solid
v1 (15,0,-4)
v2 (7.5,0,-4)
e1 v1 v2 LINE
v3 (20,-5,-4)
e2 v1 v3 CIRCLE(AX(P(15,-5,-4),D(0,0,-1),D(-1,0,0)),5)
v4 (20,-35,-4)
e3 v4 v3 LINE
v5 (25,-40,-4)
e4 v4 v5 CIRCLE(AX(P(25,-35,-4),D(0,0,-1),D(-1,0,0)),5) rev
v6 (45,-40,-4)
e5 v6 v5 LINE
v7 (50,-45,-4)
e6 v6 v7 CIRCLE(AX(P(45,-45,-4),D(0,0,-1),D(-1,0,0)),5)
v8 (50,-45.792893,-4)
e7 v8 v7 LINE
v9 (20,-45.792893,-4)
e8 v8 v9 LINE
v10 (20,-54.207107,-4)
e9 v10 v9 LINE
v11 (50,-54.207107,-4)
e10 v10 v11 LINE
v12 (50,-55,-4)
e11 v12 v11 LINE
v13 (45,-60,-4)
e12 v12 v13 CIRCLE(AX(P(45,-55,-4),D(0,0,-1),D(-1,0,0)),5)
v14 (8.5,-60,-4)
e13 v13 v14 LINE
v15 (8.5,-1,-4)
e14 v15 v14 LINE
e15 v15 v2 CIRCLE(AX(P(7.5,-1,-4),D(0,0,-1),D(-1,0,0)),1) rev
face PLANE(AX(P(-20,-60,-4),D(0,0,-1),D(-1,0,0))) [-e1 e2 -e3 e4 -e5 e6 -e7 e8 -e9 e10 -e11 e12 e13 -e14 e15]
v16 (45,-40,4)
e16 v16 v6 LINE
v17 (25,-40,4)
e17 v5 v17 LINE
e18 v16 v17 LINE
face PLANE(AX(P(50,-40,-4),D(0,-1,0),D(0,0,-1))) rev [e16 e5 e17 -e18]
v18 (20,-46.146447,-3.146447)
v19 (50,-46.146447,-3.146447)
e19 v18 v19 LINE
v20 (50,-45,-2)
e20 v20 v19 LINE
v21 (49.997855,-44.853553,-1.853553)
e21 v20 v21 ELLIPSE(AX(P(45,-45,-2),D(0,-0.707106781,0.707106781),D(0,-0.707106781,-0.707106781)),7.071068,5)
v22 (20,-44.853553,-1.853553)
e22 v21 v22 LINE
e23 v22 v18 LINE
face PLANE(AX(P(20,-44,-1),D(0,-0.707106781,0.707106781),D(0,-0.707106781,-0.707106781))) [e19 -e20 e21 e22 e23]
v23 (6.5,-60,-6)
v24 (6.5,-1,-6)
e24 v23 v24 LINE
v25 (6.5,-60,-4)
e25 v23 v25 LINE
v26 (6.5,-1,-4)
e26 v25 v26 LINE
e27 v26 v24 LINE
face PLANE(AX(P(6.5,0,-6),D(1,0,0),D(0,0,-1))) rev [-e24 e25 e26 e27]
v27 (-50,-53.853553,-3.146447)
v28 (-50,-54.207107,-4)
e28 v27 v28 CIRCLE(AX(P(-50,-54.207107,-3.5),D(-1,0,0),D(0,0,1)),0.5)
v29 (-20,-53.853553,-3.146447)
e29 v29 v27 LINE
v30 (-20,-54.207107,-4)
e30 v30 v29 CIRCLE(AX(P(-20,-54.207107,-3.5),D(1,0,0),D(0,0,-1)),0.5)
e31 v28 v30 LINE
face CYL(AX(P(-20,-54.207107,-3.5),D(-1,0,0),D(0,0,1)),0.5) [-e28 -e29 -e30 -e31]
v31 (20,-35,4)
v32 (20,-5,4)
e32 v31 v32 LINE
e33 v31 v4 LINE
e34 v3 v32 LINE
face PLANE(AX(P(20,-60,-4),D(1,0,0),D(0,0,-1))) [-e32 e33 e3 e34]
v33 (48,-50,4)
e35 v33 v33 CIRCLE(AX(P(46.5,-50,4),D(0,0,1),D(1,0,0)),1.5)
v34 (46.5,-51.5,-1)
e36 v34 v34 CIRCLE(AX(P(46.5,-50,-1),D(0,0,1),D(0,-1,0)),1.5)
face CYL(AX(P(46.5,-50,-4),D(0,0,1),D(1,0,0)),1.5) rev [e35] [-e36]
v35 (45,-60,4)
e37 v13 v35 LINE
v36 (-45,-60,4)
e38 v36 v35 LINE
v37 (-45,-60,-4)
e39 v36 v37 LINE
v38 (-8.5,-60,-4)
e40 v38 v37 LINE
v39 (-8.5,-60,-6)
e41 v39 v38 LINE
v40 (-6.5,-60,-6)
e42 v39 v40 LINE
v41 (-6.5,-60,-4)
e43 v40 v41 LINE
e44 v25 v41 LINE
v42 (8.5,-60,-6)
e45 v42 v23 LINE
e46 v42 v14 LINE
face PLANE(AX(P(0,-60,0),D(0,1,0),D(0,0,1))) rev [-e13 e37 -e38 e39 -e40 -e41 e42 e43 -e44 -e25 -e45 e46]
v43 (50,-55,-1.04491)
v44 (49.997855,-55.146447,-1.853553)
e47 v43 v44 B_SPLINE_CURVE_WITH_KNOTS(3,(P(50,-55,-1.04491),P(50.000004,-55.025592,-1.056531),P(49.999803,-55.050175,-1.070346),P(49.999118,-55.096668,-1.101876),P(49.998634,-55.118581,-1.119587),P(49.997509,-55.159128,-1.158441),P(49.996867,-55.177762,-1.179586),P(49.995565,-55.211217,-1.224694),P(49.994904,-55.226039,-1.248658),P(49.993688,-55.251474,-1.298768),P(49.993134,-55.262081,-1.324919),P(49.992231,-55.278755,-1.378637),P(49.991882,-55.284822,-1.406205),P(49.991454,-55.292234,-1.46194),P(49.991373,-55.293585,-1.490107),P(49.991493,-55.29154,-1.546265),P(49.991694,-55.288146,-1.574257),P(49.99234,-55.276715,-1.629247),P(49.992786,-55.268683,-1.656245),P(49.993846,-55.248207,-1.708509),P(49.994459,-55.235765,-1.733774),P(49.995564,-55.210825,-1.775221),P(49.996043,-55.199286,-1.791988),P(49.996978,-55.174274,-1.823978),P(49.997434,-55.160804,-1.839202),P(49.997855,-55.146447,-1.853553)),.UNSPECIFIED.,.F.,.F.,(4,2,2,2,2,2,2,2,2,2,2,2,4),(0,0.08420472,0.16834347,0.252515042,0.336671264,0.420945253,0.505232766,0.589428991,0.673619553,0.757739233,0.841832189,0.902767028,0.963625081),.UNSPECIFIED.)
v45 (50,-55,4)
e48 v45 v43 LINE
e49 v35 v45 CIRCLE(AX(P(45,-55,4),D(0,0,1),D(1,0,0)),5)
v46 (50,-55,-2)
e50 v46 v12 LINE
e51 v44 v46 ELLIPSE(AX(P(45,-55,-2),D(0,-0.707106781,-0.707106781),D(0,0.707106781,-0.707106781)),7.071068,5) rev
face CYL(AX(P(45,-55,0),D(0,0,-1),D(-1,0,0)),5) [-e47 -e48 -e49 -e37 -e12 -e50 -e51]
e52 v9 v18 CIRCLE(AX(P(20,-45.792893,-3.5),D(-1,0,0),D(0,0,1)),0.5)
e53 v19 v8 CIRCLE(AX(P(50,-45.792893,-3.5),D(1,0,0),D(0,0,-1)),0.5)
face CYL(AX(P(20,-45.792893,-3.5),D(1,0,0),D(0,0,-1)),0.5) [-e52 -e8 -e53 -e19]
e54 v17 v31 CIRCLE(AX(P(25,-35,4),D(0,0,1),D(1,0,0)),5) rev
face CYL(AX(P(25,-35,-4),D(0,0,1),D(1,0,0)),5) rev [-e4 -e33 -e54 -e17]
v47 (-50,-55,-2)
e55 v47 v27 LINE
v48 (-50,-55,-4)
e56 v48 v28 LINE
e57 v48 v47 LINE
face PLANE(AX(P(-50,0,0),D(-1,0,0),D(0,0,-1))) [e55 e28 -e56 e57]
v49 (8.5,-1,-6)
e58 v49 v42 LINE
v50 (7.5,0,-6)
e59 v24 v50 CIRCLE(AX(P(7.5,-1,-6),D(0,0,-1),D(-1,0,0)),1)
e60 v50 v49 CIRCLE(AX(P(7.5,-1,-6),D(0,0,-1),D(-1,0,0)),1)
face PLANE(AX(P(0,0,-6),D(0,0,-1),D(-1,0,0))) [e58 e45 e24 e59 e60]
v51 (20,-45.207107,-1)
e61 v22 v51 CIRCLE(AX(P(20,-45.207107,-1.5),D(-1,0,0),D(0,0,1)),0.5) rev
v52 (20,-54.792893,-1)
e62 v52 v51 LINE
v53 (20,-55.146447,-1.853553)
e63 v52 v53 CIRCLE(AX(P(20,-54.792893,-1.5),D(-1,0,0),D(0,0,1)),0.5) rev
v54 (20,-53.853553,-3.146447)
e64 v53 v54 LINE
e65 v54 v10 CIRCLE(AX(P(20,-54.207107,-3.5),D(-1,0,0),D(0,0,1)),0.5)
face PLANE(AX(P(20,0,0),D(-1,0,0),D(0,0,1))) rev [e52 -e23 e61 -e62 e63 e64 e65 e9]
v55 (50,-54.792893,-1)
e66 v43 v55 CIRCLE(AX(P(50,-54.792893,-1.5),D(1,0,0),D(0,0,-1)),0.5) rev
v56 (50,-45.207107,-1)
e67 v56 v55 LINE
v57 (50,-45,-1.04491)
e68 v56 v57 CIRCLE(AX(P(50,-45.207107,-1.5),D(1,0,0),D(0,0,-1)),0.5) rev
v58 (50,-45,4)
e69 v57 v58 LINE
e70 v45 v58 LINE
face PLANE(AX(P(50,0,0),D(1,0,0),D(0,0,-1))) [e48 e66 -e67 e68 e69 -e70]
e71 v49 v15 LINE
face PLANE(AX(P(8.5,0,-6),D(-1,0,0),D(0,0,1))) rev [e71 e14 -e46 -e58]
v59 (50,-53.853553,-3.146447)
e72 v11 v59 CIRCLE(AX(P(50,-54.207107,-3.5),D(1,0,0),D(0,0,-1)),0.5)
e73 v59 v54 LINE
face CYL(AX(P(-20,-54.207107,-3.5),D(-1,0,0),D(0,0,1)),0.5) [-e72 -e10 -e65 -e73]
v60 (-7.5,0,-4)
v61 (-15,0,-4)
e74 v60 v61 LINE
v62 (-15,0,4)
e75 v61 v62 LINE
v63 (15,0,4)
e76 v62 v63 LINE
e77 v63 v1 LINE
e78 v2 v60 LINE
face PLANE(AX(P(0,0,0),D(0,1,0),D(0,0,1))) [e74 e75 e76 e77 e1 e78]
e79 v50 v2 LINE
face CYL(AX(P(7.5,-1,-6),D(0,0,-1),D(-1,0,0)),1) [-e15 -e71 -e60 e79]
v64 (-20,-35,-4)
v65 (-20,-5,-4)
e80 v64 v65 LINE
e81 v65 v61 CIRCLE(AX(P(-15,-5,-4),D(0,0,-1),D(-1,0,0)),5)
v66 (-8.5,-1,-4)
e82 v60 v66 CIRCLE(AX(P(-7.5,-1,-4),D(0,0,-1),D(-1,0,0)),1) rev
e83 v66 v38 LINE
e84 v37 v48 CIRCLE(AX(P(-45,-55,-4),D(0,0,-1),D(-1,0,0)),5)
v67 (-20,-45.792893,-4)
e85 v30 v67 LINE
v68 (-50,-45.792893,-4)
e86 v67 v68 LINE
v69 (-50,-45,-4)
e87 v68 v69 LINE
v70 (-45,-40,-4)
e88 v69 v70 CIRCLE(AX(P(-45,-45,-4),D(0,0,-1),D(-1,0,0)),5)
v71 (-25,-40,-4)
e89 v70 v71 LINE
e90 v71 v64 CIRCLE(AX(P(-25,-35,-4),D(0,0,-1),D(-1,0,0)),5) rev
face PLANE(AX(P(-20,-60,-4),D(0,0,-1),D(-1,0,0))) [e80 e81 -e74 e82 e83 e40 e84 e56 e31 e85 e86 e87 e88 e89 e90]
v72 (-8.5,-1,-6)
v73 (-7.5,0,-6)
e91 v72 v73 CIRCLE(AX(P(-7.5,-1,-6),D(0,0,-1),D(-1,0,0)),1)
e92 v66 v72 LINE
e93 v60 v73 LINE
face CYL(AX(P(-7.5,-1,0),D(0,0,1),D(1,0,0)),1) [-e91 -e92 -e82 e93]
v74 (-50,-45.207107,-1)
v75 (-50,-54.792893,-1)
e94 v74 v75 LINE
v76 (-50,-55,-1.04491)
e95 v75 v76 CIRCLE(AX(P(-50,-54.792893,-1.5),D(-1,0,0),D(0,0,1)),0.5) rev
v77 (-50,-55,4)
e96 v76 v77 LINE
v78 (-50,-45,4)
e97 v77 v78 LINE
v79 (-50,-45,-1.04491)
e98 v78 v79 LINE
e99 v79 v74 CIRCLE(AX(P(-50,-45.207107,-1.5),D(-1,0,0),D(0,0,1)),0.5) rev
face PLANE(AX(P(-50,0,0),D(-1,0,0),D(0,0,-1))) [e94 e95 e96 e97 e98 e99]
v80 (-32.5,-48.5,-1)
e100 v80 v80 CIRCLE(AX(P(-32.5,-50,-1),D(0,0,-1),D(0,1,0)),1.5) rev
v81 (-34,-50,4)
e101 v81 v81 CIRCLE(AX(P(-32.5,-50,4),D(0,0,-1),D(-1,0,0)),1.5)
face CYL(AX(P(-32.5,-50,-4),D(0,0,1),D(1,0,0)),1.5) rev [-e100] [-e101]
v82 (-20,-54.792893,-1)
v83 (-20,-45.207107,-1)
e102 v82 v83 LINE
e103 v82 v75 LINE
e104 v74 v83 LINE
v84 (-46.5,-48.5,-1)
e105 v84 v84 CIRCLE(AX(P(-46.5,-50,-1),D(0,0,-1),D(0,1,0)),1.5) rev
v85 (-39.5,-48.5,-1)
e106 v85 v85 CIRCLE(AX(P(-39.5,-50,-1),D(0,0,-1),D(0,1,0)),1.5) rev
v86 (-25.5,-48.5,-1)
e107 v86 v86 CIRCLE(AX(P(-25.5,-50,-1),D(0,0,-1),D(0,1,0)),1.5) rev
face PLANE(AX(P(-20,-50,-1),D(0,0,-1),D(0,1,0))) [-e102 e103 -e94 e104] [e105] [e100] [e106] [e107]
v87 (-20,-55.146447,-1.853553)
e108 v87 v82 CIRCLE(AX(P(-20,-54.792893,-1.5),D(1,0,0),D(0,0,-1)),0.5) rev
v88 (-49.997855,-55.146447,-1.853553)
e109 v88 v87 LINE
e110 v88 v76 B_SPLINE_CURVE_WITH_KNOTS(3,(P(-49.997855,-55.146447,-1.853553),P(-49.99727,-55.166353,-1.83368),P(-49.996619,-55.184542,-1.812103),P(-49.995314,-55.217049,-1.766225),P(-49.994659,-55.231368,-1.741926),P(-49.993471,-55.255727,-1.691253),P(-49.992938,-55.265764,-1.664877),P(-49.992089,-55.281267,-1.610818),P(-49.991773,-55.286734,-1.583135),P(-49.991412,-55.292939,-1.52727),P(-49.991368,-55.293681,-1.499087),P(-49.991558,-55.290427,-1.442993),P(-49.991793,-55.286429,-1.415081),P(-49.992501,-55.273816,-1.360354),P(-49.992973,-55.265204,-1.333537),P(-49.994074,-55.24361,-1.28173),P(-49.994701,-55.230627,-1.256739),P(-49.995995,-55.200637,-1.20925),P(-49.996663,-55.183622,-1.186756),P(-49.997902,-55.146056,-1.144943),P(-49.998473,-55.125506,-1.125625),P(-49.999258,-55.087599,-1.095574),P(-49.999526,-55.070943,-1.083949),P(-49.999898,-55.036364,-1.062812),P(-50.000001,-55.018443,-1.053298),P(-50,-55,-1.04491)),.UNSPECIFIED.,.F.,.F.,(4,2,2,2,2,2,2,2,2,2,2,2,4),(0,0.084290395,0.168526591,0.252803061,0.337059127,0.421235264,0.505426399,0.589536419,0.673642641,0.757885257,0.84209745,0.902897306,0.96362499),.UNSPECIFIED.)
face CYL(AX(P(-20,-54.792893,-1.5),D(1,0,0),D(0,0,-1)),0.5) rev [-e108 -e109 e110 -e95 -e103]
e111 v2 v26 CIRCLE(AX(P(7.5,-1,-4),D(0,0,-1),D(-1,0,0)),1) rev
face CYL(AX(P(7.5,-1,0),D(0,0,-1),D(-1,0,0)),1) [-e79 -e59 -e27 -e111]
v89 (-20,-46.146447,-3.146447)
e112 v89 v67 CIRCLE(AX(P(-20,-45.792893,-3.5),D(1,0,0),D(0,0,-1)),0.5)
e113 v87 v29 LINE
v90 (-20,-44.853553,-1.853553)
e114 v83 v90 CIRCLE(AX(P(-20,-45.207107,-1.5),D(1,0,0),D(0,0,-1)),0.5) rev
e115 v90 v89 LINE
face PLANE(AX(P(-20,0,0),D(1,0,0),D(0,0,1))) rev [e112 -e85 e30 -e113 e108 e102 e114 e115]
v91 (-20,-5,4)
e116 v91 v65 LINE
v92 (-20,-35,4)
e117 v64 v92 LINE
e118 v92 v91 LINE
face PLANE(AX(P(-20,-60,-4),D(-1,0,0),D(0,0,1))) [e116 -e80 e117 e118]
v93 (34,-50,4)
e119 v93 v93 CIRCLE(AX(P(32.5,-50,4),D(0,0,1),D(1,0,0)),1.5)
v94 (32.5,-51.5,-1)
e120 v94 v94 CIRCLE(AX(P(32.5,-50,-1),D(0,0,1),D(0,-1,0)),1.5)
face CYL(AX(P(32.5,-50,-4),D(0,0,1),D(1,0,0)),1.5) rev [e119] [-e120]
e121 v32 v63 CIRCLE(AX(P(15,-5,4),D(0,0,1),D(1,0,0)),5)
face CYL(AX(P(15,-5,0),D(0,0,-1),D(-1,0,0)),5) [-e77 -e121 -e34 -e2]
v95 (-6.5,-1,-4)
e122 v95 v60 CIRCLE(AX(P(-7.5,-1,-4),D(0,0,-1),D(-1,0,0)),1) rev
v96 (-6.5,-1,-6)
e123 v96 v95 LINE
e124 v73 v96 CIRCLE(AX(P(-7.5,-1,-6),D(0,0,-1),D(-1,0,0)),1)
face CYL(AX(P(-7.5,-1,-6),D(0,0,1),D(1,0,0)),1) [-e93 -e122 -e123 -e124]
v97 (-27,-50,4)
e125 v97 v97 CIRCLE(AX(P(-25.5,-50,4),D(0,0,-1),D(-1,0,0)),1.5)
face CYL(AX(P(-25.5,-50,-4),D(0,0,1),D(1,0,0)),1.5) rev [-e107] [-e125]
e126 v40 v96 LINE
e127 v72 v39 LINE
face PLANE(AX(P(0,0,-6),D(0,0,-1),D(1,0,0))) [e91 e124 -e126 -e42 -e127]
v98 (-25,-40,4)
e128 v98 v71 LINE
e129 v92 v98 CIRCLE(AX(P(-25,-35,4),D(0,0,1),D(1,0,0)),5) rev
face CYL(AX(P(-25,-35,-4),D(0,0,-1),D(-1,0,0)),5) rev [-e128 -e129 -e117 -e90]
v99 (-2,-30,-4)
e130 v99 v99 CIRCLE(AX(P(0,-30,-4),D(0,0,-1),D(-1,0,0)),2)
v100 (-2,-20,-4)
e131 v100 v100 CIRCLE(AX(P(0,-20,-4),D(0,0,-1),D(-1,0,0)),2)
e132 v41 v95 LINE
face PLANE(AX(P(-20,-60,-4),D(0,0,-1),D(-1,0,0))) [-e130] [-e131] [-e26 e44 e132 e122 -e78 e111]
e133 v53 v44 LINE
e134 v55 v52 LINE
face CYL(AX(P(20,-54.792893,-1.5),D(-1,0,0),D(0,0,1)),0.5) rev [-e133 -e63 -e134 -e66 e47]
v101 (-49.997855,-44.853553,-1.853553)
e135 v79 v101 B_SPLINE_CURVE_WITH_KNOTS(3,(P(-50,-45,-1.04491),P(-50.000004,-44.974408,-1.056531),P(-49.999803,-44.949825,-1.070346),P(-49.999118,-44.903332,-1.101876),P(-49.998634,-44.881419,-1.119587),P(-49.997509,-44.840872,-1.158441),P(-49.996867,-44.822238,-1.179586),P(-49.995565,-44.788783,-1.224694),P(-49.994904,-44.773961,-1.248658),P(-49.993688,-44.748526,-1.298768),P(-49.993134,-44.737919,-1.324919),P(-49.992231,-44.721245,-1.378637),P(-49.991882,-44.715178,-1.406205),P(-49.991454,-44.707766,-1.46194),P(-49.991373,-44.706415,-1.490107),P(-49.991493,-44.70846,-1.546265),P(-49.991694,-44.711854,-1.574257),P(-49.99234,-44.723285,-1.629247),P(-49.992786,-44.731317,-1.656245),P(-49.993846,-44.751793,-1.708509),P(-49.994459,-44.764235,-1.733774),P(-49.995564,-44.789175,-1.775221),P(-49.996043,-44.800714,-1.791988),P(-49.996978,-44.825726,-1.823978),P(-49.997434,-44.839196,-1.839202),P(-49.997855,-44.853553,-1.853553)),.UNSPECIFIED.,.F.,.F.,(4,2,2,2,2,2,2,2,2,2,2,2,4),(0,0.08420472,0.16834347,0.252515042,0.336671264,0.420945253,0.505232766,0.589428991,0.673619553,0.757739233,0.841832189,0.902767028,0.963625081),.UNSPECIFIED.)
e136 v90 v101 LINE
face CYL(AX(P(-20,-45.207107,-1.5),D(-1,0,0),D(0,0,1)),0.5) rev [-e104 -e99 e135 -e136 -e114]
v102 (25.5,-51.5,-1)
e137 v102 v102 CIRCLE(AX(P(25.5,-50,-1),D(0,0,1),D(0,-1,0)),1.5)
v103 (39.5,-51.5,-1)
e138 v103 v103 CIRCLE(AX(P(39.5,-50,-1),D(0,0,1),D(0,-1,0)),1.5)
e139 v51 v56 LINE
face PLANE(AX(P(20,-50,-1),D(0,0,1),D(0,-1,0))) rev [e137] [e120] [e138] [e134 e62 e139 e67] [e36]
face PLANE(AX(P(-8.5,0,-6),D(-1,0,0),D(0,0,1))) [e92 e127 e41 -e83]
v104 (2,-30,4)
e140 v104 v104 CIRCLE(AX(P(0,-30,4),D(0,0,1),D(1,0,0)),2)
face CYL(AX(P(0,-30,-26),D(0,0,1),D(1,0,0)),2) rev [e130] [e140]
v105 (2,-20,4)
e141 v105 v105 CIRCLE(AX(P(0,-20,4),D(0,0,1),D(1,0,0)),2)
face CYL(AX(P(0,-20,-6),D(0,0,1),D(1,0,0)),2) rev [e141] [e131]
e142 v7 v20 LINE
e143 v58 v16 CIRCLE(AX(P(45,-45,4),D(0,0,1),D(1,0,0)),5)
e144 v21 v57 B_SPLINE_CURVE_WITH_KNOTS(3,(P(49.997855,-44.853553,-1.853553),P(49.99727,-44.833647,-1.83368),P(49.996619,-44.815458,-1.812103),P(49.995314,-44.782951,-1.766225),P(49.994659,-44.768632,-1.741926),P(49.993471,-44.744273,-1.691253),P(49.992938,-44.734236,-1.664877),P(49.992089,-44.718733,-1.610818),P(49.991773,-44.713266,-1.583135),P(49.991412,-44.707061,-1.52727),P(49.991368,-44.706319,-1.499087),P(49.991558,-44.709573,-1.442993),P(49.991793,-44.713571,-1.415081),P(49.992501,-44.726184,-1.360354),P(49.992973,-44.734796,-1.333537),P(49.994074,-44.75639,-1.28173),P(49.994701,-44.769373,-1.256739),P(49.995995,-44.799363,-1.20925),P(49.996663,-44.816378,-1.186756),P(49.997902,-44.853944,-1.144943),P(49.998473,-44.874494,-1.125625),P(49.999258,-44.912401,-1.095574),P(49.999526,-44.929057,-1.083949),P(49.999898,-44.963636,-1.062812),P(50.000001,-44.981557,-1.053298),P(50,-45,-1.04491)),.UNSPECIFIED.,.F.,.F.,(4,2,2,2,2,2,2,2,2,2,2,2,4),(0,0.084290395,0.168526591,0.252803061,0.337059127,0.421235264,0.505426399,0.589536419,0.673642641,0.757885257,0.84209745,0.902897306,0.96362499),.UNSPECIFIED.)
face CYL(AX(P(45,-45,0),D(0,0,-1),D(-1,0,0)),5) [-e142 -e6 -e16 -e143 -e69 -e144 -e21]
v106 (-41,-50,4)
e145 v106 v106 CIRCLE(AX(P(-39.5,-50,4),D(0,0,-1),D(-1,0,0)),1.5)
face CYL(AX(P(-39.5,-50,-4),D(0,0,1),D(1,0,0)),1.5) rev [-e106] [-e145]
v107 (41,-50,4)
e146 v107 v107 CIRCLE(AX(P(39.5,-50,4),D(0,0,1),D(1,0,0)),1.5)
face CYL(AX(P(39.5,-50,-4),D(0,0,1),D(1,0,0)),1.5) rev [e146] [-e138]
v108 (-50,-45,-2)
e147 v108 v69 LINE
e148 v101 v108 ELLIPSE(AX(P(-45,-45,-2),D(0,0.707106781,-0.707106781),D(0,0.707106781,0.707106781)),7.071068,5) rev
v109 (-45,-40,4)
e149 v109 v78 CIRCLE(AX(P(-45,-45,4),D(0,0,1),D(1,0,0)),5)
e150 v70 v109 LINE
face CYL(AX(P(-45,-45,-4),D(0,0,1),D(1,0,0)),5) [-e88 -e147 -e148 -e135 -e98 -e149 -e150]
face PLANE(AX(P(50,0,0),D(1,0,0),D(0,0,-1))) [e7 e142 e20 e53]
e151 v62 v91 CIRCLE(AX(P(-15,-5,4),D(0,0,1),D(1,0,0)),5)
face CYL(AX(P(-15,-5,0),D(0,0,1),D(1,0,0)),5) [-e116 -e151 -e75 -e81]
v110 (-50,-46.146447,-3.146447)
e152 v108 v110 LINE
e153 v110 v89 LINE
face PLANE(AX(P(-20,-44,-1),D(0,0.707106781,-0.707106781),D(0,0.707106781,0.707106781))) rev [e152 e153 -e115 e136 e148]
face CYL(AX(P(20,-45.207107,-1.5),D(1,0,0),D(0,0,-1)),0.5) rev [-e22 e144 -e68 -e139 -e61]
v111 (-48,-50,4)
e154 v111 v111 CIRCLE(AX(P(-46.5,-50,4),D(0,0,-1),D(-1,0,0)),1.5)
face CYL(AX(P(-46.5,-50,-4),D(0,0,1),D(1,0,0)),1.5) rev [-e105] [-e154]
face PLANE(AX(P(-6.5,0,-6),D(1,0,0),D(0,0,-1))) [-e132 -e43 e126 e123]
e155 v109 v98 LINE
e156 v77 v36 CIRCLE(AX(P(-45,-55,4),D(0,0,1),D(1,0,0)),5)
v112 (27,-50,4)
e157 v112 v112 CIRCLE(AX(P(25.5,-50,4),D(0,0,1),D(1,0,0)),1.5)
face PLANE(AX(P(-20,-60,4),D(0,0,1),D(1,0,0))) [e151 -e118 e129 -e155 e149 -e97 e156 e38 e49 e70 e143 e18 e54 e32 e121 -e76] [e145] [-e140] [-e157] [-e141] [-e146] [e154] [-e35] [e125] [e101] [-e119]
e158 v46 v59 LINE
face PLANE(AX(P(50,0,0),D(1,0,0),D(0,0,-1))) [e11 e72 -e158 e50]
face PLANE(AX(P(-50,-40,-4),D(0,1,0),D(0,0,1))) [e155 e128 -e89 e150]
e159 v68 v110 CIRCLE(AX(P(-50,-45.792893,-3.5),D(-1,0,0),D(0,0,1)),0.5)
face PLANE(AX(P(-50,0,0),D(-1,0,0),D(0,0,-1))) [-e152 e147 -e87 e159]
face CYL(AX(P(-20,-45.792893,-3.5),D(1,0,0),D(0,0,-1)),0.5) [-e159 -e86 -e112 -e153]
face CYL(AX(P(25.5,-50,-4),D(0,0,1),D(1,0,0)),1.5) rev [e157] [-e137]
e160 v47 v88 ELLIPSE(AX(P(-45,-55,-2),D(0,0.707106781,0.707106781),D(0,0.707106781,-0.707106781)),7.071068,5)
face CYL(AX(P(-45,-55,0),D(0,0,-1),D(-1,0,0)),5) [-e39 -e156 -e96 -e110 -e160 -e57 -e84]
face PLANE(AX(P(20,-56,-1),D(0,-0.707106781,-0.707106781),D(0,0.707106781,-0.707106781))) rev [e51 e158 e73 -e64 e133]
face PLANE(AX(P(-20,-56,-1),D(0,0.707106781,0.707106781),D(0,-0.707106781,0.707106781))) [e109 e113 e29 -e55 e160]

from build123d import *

# Parameters (mm, degrees)
SKETCH1_W               = 40
SKETCH1_H               = 8
BOSS_EXTRUDE1_DEPTH     = 60
SKETCH2_W               = 8
SKETCH2_H               = 20
BOSS_EXTRUDE2_DEPTH     = 30
CUT_EXTRUDE1_DEPTH      = 30
SKETCH6_R               = 1.5
CUT_EXTRUDE2_DEPTH      = 79.511145706
LPATTERN1_COUNT         = 4
LPATTERN1_PITCH         = 7
MIRROR3_COPY_1_SKETCH_R = 1.5
MIRROR3_COPY_1_DEPTH    = 79.511145706
MIRROR3_COPY_2_SKETCH_R = 1.5
MIRROR3_COPY_2_DEPTH    = 79.511145706
MIRROR3_COPY_3_SKETCH_R = 1.5
MIRROR3_COPY_3_DEPTH    = 79.511145706
SKETCH7_R               = 2
CUT_EXTRUDE3_DEPTH      = 30
SKETCH8_W               = 2
SKETCH8_H               = 60
BOSS_EXTRUDE3_DEPTH     = 2
FILLET1_R               = 1
FILLET1_OF_MIRROR4_R    = 1
FILLET2_R               = 0.5
FILLET3_R               = 5
SKETCH9_R               = 2
CUT_EXTRUDE4_DEPTH      = 10


# Some blends are built 0.0001 mm under size
with BuildPart() as part:
    # Sketch1 → Boss-Extrude1 (new body)
    with BuildSketch(Plane(origin=(0, 0, 0), x_dir=(1, 0, 0), z_dir=(0, 1, 0))):
        Rectangle(SKETCH1_W, SKETCH1_H)
    extrude(amount=-BOSS_EXTRUDE1_DEPTH)

    # Sketch2 → Boss-Extrude2 (add)
    with BuildSketch(Plane(origin=(20, 0, 0), x_dir=(0, 0, -1), z_dir=(1, 0, 0))):
        with Locations((0, -50)):
            Rectangle(SKETCH2_W, SKETCH2_H)
    boss_extrude2 = extrude(amount=BOSS_EXTRUDE2_DEPTH)

    # Sketch3 → Cut-Extrude1 (cut)
    with BuildSketch(Plane(origin=(50, 0, 0), x_dir=(0, 0, -1), z_dir=(1, 0, 0))):
        Polygon((1, -50), (1, -56), (4, -53), (4, -47), (1, -44), align=None)
    cut_extrude1 = extrude(amount=-CUT_EXTRUDE1_DEPTH, mode=Mode.SUBTRACT)

    # Sketch6 → Cut-Extrude2 (cut, through all)
    with BuildSketch(Plane.XY.offset(4)):
        with Locations((46.5, -50)):
            Circle(SKETCH6_R)
    cut_extrude2 = extrude(amount=-CUT_EXTRUDE2_DEPTH, mode=Mode.SUBTRACT)

    # LPattern1: Cut-Extrude2 ×4
    with Locations(*[(-i * LPATTERN1_PITCH, 0, 0) for i in range(1, LPATTERN1_COUNT)]):
        add(cut_extrude2, mode=Mode.SUBTRACT)

    # Mirror3: Boss-Extrude2, Cut-Extrude1, Cut-Extrude2 across plane
    add(boss_extrude2.mirror(Plane(origin=(0, 0, 0), x_dir=(0, 0, 1), z_dir=(1, 0, 0))))
    add(cut_extrude1.mirror(Plane(origin=(0, 0, 0), x_dir=(0, 0, 1), z_dir=(1, 0, 0))), mode=Mode.SUBTRACT)
    add(cut_extrude2.mirror(Plane(origin=(0, 0, 0), x_dir=(0, 0, 1), z_dir=(1, 0, 0))), mode=Mode.SUBTRACT)

    # Mirror3 copy 1 sketch → Mirror3 copy 1 (cut, through all)
    with BuildSketch(Plane(origin=(7, 0, 4), x_dir=(-1, 0, 0), z_dir=(0, 0, 1))):
        with Locations((46.5, 50)):
            Circle(MIRROR3_COPY_1_SKETCH_R)
    extrude(amount=-MIRROR3_COPY_1_DEPTH, mode=Mode.SUBTRACT)

    # Mirror3 copy 2 sketch → Mirror3 copy 2 (cut, through all)
    with BuildSketch(Plane(origin=(14, 0, 4), x_dir=(-1, 0, 0), z_dir=(0, 0, 1))):
        with Locations((46.5, 50)):
            Circle(MIRROR3_COPY_2_SKETCH_R)
    extrude(amount=-MIRROR3_COPY_2_DEPTH, mode=Mode.SUBTRACT)

    # Mirror3 copy 3 sketch → Mirror3 copy 3 (cut, through all)
    with BuildSketch(Plane(origin=(21, 0, 4), x_dir=(-1, 0, 0), z_dir=(0, 0, 1))):
        with Locations((46.5, 50)):
            Circle(MIRROR3_COPY_3_SKETCH_R)
    extrude(amount=-MIRROR3_COPY_3_DEPTH, mode=Mode.SUBTRACT)

    # Sketch7 → Cut-Extrude3 (cut)
    with BuildSketch(Plane.XY.offset(4)):
        with Locations((0, -30)):
            Circle(SKETCH7_R)
    extrude(amount=-CUT_EXTRUDE3_DEPTH, mode=Mode.SUBTRACT)

    # Sketch8 → Boss-Extrude3 (add)
    with BuildSketch(Plane(origin=(0, 0, -4), x_dir=(-1, 0, 0), z_dir=(0, 0, -1))):
        with Locations((-7.5, -30)):
            Rectangle(SKETCH8_W, SKETCH8_H)
    boss_extrude3 = extrude(amount=BOSS_EXTRUDE3_DEPTH)

    # Fillet1
    fillet1_edges = [part.edges().sort_by_distance(p)[0] for p in [
        (8.5, 0, -5),
        (6.5, 0, -5),
    ]]
    fillet(fillet1_edges, radius=FILLET1_R - 0.0001)  # a hair under: the kernel refuses the full size

    # Mirror4: Boss-Extrude3 across plane
    add(boss_extrude3.mirror(Plane(origin=(0, 0, 0), x_dir=(0, 0, 1), z_dir=(1, 0, 0))))

    # Fillet1 of Mirror4
    fillet1_of_mirror4_edges = [part.edges().sort_by_distance(p)[0] for p in [
        (-8.5, 0, -5),
        (-6.5, 0, -5),
    ]]
    fillet(fillet1_of_mirror4_edges, radius=FILLET1_OF_MIRROR4_R - 0.0001)  # a hair under: the kernel refuses the full size

    # Fillet2
    fillet2_edges = [part.edges().sort_by_distance(p)[0] for p in [
        (35, -44, -1),
        (35, -47, -4),
        (35, -53, -4),
        (35, -56, -1),
        (-35, -44, -1),
        (-35, -56, -1),
        (-35, -53, -4),
        (-35, -47, -4),
    ]]
    fillet(fillet2_edges, radius=FILLET2_R)

    # Fillet3
    # the kernel refuses this fillet: 5 mm, written as the material it adds along each edge
    with BuildSketch(Plane(origin=(20, -40, 4), x_dir=(1, 0, 0), z_dir=(0, 0, -1))) as fillet3_piece_1:
        with BuildLine():
            CenterArc((FILLET3_R, -FILLET3_R), FILLET3_R, 90, 90)
            Line((0, -FILLET3_R), (0, 0))
            Line((0, 0), (FILLET3_R, 0))
        make_face()
    extrude(amount=8)
    with BuildSketch(Plane(origin=(-20, -40, 4), x_dir=(-1, 0, 0), z_dir=(0, 0, -1))) as fillet3_piece_2:
        with BuildLine():
            CenterArc((FILLET3_R, FILLET3_R), FILLET3_R, 180, 90)
            Line((0, FILLET3_R), (0, 0))
            Line((0, 0), (FILLET3_R, 0))
        make_face()
    extrude(amount=8)
    # the kernel refuses this fillet: 5 mm, written as the material it takes off along each edge
    with BuildSketch(Plane(origin=(50, -60, -16.5), x_dir=(-1, 0, 0), z_dir=(0, 0, 1)), Plane(origin=(-50, -40, 16.5), x_dir=(0, -1, 0), z_dir=(0, 0, -1)), Plane(origin=(-50, -60, -16.5), x_dir=(0, 1, 0), z_dir=(0, 0, 1))) as fillet3_2_piece_1:
        with BuildLine():
            CenterArc((FILLET3_R, -FILLET3_R), FILLET3_R, 90, 90)
            Line((0, -FILLET3_R), (0, 0))
            Line((0, 0), (FILLET3_R, 0))
        make_face()
    extrude(amount=33, mode=Mode.SUBTRACT)
    with BuildSketch(Plane(origin=(50, -40, 16.5), x_dir=(0, -1, 0), z_dir=(0, 0, -1)), Plane(origin=(-20, 0, 16.5), x_dir=(1, 0, 0), z_dir=(0, 0, -1)), Plane(origin=(20, 0, -16.5), x_dir=(-1, 0, 0), z_dir=(0, 0, 1))) as fillet3_2_piece_2:
        with BuildLine():
            CenterArc((FILLET3_R, FILLET3_R), FILLET3_R, 180, 90)
            Line((0, FILLET3_R), (0, 0))
            Line((0, 0), (FILLET3_R, 0))
        make_face()
    extrude(amount=33, mode=Mode.SUBTRACT)

    # Sketch9 → Cut-Extrude4 (cut)
    with BuildSketch(Plane.XY.offset(4)):
        with Locations((0, -20)):
            Circle(SKETCH9_R)
    extrude(amount=-CUT_EXTRUDE4_DEPTH, mode=Mode.SUBTRACT)


solid = part.part
